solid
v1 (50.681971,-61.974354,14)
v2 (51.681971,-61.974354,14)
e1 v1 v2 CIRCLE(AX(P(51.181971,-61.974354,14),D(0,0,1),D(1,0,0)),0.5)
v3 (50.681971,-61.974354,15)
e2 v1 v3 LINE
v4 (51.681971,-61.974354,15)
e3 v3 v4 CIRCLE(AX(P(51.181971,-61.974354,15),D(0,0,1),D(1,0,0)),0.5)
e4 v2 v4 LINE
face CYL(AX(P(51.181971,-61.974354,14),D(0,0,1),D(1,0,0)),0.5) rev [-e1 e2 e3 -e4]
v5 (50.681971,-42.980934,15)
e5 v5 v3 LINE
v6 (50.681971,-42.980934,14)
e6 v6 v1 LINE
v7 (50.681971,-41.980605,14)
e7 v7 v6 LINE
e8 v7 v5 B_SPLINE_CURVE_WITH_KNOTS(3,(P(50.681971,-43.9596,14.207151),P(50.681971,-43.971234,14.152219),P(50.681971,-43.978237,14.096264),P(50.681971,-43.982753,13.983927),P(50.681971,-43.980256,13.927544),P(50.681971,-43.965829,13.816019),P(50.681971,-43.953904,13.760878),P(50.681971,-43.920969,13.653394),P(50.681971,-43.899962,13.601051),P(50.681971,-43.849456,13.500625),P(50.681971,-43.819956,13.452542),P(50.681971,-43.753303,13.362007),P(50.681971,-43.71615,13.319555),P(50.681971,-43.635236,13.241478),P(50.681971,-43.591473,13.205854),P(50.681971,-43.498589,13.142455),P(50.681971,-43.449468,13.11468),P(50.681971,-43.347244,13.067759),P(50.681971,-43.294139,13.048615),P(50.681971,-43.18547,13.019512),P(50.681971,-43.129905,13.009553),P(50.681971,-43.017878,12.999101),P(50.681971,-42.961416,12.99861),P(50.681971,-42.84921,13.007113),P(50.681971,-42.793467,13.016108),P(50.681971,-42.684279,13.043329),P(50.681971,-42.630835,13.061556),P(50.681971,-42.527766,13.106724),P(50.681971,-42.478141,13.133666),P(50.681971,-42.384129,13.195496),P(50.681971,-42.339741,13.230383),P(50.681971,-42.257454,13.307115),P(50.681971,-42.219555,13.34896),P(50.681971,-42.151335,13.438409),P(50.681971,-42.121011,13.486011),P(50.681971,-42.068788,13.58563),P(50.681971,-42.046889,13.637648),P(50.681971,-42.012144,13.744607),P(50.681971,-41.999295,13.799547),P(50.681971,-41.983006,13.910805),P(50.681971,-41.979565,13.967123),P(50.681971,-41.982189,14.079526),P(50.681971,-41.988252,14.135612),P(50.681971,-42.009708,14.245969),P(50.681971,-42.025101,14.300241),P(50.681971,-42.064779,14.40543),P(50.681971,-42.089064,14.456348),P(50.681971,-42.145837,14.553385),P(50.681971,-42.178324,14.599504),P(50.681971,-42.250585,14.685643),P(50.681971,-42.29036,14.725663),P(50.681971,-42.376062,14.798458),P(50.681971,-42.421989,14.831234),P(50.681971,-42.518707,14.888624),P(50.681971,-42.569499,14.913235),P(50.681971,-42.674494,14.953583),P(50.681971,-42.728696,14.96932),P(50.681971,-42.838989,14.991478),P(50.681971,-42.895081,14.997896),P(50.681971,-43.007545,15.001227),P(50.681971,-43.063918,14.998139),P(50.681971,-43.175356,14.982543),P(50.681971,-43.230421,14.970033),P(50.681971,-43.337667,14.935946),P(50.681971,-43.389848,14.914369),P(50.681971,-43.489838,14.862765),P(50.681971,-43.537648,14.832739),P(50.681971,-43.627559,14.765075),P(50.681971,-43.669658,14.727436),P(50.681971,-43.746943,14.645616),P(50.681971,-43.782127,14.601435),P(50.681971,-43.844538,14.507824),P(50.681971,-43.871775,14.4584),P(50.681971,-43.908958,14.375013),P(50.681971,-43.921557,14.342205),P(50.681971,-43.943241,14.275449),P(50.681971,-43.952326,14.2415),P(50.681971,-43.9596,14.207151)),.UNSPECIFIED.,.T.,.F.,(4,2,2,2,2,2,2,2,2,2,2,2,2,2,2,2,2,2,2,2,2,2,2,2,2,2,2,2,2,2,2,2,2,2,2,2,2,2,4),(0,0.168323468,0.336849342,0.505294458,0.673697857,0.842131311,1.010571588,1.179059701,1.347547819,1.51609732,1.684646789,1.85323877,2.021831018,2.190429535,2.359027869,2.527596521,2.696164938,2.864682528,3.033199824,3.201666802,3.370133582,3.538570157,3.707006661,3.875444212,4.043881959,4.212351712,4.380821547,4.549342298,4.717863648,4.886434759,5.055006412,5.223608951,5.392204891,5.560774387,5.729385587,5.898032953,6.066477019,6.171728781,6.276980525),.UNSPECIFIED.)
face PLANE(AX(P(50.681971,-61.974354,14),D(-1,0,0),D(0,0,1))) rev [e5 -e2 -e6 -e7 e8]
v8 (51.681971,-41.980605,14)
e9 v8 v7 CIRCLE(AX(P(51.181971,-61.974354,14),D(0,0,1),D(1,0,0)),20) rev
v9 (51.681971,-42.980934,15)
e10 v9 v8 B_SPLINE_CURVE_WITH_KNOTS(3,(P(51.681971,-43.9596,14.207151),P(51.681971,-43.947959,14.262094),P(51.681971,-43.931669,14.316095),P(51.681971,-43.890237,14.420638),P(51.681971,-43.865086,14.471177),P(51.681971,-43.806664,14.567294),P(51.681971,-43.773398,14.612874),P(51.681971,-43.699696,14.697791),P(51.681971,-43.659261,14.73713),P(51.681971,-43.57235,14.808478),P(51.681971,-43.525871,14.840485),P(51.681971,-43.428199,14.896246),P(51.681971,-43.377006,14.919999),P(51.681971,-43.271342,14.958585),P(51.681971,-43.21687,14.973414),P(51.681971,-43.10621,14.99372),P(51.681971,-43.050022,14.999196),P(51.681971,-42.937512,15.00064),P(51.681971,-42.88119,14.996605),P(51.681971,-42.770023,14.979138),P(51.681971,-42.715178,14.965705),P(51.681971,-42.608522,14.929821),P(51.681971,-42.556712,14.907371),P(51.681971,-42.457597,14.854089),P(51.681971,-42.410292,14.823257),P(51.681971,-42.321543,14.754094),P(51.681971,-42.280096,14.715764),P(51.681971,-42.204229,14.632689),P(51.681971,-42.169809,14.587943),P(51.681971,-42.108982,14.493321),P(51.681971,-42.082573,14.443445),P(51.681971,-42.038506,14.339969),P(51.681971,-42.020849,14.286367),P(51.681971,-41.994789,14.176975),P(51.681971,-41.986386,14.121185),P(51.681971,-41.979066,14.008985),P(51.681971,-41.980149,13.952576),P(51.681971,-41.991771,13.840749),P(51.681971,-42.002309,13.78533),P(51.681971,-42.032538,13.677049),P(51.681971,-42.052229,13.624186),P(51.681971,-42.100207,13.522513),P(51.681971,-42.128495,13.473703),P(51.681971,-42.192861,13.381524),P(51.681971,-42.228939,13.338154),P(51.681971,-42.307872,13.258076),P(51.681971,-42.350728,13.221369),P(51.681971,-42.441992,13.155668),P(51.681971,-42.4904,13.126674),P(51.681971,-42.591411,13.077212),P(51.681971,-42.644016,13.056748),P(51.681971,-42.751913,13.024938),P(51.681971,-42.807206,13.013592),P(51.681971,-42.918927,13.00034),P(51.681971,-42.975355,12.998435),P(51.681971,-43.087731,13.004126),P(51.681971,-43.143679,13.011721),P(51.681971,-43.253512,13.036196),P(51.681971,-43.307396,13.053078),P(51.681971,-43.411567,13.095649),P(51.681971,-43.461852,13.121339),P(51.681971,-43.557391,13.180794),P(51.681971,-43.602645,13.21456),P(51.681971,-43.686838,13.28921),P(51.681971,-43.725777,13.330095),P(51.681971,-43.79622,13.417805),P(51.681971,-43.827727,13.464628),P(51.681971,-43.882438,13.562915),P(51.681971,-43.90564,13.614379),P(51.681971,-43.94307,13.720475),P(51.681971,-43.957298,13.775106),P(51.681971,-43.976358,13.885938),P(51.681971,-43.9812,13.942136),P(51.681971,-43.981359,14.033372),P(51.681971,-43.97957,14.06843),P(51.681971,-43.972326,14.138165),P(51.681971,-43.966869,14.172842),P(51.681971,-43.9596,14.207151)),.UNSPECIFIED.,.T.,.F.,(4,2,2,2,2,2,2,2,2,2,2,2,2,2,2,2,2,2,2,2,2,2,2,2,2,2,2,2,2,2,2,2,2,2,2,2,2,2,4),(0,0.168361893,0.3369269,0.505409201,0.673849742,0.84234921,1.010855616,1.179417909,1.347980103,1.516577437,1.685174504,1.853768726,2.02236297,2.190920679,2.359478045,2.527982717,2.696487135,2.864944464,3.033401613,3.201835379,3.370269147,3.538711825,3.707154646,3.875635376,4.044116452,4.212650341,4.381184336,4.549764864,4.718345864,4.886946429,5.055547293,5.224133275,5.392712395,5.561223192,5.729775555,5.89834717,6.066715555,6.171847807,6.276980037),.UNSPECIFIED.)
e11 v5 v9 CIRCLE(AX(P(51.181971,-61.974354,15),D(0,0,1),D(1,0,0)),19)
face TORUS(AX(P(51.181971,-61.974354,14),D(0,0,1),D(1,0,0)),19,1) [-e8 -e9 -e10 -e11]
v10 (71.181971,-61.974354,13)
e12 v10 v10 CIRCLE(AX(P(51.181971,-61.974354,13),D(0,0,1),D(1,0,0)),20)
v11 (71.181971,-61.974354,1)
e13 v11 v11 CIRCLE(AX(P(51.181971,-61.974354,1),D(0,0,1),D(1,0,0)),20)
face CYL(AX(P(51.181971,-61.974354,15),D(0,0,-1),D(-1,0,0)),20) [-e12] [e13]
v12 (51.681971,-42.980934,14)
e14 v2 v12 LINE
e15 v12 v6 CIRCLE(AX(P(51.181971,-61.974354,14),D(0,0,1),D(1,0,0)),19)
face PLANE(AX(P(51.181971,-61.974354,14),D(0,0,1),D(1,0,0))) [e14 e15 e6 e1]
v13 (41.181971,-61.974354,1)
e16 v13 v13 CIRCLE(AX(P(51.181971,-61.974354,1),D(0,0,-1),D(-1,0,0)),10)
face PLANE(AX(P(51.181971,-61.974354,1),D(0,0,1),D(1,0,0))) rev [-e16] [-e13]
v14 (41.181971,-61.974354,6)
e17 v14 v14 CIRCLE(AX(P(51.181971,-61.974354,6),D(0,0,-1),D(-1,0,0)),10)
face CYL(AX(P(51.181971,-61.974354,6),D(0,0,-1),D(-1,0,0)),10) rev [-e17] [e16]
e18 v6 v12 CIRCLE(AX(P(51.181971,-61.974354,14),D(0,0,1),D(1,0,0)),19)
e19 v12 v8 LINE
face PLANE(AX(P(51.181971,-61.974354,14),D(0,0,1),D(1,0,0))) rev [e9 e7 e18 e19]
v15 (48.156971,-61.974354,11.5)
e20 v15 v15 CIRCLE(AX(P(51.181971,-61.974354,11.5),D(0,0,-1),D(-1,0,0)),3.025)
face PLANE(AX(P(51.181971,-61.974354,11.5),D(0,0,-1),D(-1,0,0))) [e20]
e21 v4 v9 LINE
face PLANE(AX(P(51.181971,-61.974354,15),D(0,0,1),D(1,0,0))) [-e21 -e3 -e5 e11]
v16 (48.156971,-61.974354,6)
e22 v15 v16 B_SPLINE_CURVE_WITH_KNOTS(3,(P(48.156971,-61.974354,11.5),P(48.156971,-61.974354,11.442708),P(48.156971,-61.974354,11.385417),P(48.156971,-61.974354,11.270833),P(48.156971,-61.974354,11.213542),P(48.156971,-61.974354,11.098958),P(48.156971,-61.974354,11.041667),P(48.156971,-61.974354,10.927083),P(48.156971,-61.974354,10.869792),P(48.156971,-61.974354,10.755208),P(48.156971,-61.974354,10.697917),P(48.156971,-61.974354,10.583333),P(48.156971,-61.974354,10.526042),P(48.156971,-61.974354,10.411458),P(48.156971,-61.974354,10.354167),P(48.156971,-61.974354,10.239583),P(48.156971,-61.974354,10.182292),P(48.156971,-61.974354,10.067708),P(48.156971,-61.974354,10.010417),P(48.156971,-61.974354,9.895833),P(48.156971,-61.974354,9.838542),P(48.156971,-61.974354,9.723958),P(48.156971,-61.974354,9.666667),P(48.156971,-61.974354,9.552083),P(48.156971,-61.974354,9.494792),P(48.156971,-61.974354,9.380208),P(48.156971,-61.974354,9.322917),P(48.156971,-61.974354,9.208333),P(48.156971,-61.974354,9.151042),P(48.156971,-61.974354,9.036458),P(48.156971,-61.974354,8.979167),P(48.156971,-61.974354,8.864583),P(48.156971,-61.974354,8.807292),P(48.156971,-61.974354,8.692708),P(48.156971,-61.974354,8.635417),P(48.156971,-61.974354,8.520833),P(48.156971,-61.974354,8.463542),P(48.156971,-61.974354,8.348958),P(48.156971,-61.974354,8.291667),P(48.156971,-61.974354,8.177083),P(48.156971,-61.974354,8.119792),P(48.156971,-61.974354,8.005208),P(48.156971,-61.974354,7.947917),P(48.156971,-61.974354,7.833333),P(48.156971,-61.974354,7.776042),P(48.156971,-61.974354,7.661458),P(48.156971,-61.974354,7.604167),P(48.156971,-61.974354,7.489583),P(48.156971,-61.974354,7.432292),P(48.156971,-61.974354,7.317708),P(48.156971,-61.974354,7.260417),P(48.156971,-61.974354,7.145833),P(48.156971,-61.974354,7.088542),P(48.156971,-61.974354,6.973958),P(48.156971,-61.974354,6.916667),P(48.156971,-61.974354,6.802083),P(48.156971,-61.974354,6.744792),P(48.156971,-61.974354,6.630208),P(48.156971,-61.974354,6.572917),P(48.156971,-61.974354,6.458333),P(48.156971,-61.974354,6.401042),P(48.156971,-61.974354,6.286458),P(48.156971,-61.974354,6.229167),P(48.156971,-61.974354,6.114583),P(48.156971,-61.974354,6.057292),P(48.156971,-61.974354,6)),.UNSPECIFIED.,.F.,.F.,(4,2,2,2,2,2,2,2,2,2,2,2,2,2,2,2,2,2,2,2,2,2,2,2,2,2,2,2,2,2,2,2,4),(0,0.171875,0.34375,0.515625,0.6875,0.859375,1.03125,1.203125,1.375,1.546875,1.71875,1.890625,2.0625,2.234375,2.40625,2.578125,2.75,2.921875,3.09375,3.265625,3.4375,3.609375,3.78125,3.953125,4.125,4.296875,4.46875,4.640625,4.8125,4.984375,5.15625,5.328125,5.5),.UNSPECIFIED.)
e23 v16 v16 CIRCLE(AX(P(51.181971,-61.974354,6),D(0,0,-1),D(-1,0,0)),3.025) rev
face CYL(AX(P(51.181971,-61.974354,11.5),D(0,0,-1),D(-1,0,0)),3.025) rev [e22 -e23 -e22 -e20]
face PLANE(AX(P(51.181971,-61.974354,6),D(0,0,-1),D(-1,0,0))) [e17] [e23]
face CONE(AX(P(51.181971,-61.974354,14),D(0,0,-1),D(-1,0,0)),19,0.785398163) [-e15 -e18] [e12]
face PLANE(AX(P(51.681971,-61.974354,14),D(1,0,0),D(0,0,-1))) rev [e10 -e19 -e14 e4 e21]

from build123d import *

# Parameters (mm, degrees)
BOSS_EXTRUDE1_START = 1
SKETCH1_R           = 20
BOSS_EXTRUDE1_DEPTH = 14
FILLET2_R           = 1
CUT_EXTRUDE1_DEPTH  = 1
CUT_EXTRUDE2_START  = -2
SKETCH4_R           = 20
SKETCH4_R_2         = 19
CUT_EXTRUDE2_DEPTH  = 1
CHAMFER1_SIZE       = 1
SKETCH5_R           = 3.025
CUT_EXTRUDE3_DEPTH  = 10.5
SKETCH6_R           = 10
CUT_EXTRUDE4_DEPTH  = 5


with BuildPart() as part:
    # Sketch1 → Boss-Extrude1 (new body)
    with BuildSketch(Plane.XY.offset(BOSS_EXTRUDE1_START)):
        with Locations((51.181970815, -61.974353767)):
            Circle(SKETCH1_R)
    extrude(amount=BOSS_EXTRUDE1_DEPTH)

    # Fillet2
    fillet2_edges = [part.edges().sort_by_distance(p)[0] for p in [
        (31.181970815, -61.974353767, 15),
    ]]
    fillet(fillet2_edges, radius=FILLET2_R)

    # Sketch3 → Cut-Extrude1 (cut)
    with BuildSketch(Plane.XY.offset(15)):
        with BuildLine():
            Line((50.681970815, -61.974353767), (50.681970815, -41.974353767))
            ThreePointArc((50.681970815, -41.974353767), (51.181970815, -41.474353767), (51.681970815, -41.974353767))
            Line((51.681970815, -41.974353767), (51.681970815, -61.974353767))
            ThreePointArc((51.681970815, -61.974353767), (51.181970815, -62.474353767), (50.681970815, -61.974353767))
        make_face()
    extrude(amount=-CUT_EXTRUDE1_DEPTH, mode=Mode.SUBTRACT)

    # Sketch4 → Cut-Extrude2 (cut)
    with BuildSketch(Plane.XY.offset(15).offset(CUT_EXTRUDE2_START)):
        with Locations((51.181970815, -61.974353767)):
            Circle(SKETCH4_R)
        with Locations((51.181970815, -61.974353767)):
            Circle(SKETCH4_R_2, mode=Mode.SUBTRACT)
    extrude(amount=CUT_EXTRUDE2_DEPTH, mode=Mode.SUBTRACT)

    # Chamfer1
    chamfer1_edges = [part.edges().sort_by_distance(p)[0] for p in [
        (32.181970815, -61.974353767, 13),
    ]]
    chamfer(chamfer1_edges, length=CHAMFER1_SIZE - 0.0001)  # a hair under: the kernel refuses the full size

    # Sketch5 → Cut-Extrude3 (cut)
    with BuildSketch(Plane(origin=(0, 0, 1), x_dir=(-1, 0, 0), z_dir=(0, 0, -1))):
        with Locations((-51.181970815, -61.974353767)):
            Circle(SKETCH5_R)
    extrude(amount=-CUT_EXTRUDE3_DEPTH, mode=Mode.SUBTRACT)

    # Sketch6 → Cut-Extrude4 (cut)
    with BuildSketch(Plane(origin=(0, 0, 1), x_dir=(-1, 0, 0), z_dir=(0, 0, -1))):
        with Locations((-51.181970815, -61.974353767)):
            Circle(SKETCH6_R)
    extrude(amount=-CUT_EXTRUDE4_DEPTH, mode=Mode.SUBTRACT)


solid = part.part
